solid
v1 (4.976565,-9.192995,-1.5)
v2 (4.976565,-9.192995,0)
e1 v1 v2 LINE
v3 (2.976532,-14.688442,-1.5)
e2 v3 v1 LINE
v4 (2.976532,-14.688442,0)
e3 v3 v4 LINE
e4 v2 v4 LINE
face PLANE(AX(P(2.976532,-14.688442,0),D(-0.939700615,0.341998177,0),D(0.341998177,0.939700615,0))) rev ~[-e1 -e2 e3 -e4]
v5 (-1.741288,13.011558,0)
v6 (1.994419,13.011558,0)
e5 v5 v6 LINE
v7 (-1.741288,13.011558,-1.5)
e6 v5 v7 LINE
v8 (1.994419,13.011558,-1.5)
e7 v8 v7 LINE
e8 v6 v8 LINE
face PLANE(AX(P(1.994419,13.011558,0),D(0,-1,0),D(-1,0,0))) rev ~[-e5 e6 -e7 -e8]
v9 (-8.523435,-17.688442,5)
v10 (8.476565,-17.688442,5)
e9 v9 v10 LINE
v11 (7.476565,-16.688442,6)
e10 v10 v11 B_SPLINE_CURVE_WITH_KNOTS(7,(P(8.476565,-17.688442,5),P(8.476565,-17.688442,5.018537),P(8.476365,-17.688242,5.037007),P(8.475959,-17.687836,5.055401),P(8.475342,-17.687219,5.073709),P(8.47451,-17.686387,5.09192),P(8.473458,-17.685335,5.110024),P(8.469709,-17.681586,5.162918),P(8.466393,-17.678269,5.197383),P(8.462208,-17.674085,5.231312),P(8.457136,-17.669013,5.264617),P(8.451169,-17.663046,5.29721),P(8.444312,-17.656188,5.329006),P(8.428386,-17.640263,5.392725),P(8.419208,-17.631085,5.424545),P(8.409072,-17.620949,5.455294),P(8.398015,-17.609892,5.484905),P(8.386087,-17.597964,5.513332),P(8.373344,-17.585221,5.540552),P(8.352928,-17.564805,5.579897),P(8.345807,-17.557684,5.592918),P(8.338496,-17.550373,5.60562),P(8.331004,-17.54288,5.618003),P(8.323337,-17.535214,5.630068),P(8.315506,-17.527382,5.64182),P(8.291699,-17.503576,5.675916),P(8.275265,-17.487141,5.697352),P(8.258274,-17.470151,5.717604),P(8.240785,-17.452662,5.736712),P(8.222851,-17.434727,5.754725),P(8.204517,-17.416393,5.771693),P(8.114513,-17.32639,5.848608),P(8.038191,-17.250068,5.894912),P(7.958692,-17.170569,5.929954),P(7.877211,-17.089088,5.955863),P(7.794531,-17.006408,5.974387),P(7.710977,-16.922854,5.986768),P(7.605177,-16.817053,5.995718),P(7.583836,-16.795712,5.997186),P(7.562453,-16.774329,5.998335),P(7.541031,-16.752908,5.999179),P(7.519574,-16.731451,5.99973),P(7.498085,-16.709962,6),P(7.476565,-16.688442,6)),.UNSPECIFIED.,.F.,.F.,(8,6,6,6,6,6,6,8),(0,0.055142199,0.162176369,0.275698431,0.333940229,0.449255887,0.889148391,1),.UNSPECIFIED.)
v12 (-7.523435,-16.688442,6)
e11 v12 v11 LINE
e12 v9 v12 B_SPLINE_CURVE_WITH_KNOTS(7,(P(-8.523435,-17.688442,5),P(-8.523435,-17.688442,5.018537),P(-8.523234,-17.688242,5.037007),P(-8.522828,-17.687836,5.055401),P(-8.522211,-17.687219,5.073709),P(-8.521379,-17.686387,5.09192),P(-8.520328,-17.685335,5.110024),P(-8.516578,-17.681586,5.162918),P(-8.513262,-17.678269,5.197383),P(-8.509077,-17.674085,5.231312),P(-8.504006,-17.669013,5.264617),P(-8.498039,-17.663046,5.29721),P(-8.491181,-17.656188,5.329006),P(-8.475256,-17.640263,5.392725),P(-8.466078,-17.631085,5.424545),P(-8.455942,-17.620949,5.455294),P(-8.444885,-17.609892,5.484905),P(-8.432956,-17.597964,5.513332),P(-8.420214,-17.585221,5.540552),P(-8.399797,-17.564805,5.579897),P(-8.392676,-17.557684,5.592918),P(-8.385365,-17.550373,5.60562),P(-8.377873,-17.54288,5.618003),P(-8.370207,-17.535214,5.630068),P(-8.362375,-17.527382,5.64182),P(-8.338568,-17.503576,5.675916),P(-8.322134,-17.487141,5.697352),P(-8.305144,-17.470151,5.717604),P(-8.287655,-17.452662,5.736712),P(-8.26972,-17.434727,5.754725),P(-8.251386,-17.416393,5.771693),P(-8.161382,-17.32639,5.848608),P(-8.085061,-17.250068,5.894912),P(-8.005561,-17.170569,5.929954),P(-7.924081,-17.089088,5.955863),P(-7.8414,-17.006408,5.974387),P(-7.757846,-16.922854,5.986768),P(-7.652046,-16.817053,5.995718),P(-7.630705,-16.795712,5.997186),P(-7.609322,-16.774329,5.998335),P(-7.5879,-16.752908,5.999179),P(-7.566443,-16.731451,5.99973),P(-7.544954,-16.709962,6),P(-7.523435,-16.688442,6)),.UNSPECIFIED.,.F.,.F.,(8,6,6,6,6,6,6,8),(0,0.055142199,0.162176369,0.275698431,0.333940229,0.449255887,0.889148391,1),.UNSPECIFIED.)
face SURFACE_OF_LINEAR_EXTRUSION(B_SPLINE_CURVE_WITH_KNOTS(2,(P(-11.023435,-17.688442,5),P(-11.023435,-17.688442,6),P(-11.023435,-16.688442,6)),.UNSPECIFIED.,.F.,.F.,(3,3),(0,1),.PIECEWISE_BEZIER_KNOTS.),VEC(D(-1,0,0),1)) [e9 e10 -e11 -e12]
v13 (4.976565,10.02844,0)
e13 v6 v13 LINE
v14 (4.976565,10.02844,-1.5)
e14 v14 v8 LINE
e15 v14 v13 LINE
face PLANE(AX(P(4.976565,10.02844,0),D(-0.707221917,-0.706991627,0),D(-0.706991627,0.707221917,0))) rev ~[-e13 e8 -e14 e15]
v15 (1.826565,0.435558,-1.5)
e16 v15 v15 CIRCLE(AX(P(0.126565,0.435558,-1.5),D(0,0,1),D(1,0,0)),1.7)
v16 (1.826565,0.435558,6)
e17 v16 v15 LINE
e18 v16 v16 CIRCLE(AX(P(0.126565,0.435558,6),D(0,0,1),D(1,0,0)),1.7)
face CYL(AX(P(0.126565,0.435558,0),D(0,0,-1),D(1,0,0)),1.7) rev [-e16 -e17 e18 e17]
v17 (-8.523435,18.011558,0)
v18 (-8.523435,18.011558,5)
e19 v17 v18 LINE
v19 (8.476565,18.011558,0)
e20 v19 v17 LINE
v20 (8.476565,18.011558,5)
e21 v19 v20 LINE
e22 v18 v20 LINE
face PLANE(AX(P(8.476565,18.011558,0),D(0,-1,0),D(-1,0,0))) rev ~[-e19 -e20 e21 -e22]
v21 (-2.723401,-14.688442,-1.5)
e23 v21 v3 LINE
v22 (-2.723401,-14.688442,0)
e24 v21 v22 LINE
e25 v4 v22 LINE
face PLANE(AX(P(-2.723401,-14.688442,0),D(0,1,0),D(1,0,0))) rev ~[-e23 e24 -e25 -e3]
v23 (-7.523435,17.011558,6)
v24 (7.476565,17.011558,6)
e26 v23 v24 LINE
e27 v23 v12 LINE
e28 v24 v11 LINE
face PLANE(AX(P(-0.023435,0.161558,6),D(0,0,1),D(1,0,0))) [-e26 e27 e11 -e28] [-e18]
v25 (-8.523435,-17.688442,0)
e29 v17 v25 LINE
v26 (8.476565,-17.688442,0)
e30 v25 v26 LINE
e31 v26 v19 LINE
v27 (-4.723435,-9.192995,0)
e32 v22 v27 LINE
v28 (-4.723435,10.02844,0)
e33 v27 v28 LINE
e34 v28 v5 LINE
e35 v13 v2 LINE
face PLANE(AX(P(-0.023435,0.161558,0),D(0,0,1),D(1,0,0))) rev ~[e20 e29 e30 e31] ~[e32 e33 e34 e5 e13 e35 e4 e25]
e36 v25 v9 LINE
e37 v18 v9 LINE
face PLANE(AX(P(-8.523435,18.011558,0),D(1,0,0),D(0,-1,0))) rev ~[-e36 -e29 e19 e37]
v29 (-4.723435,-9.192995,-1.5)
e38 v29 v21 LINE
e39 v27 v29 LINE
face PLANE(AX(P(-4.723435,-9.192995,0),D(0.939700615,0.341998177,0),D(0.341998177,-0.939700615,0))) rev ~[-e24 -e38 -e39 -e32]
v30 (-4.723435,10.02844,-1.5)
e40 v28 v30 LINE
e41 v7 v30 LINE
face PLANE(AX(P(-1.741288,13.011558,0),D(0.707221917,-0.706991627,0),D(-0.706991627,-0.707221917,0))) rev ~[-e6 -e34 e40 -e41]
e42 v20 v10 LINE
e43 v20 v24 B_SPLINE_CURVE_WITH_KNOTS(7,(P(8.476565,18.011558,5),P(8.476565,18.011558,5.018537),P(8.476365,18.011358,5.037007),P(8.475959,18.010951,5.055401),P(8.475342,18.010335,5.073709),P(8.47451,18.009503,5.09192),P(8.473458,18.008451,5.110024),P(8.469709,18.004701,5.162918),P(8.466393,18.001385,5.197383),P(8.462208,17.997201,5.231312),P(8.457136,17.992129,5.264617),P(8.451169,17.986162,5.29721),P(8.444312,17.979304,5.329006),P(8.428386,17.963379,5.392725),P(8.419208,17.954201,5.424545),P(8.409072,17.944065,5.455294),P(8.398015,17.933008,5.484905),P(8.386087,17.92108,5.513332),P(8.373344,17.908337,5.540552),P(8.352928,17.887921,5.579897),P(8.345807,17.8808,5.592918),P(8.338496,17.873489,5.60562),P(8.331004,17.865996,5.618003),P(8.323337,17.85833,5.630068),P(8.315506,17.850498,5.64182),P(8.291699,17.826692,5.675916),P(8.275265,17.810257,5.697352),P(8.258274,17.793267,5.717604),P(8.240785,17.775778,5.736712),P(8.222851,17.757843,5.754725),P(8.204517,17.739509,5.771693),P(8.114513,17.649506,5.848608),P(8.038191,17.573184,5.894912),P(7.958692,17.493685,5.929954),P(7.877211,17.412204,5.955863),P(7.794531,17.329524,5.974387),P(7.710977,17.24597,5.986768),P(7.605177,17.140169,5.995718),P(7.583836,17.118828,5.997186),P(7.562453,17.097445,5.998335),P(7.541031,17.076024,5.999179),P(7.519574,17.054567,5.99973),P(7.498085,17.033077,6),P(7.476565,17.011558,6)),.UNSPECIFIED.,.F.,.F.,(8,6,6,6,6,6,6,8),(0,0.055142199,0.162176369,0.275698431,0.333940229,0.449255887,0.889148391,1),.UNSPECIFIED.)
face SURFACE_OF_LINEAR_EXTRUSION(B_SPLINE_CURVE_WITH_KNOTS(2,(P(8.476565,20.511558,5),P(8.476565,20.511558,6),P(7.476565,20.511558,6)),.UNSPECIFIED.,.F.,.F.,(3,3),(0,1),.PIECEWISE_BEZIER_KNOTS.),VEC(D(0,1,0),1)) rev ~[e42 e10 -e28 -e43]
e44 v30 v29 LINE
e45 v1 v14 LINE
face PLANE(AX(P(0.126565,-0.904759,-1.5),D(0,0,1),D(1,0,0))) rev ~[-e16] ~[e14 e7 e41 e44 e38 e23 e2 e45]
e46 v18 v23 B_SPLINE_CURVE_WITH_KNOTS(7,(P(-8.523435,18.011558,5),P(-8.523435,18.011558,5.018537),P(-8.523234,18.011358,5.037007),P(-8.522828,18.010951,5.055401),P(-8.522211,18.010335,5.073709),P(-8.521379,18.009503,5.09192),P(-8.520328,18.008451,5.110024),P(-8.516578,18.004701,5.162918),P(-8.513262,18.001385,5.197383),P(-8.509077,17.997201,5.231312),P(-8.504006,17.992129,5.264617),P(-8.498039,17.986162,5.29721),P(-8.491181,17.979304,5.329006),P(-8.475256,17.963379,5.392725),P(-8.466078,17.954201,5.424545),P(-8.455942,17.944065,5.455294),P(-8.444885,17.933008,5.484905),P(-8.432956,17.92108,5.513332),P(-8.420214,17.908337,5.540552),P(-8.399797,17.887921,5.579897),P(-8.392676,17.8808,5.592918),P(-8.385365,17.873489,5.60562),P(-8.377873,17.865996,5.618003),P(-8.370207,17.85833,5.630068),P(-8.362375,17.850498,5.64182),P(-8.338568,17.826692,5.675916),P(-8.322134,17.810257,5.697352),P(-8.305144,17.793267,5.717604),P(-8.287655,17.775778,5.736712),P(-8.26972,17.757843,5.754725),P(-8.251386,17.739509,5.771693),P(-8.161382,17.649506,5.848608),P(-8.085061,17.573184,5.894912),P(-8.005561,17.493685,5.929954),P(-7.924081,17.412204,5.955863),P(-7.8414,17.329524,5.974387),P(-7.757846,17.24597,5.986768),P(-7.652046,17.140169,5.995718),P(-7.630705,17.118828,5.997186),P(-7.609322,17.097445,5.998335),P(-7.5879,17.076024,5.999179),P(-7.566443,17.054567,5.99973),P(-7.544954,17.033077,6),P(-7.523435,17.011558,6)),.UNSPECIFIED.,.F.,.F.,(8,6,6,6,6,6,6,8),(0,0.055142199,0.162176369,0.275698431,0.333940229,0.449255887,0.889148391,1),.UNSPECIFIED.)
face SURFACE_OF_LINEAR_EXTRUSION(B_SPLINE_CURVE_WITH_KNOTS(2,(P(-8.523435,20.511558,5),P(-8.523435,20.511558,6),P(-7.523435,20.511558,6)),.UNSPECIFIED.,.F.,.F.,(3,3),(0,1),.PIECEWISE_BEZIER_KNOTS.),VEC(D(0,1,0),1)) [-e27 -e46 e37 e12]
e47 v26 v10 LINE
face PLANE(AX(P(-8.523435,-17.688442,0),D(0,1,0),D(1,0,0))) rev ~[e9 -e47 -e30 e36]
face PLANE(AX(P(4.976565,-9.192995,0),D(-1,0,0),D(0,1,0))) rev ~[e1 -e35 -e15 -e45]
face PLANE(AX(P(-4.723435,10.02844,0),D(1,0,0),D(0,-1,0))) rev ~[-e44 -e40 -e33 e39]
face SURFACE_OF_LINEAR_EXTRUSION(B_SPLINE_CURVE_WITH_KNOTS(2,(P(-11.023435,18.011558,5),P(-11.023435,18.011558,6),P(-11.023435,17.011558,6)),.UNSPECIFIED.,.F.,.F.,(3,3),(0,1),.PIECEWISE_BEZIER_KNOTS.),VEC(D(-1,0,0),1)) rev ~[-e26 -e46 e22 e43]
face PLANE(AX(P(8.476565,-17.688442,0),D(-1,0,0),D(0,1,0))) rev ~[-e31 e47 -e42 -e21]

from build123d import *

# Parameters (mm, degrees)
F0_R          = 1.7
F1_DEPTH      = 1.5
F1_DEPTH_BACK = 6
F2_DEPTH      = 6
F3_T1_DEPTH   = 22
F3_T3_DEPTH   = 40.7


# Not quite as in the source:
# - a fillet or chamfer that OpenCascade refuses, or shapes differently, is made with other operations: its cross-section is extruded or revolved along the edge and cut away or added


with BuildPart() as f1:
    # F0 (on Top) → F1 (new body, two sides)
    with BuildSketch(Plane.XY) as f1_sk:
        Polygon((-4.7234346752, 0.4355579215), (-4.7234346752, -9.1929948391), (-2.7234009317, -14.6884420785), (2.9765315813, -14.6884420785), (4.9765653248, -9.1929948391), (4.9765653248, 0.4355579215), (4.9765653248, 10.028440195), (1.9944189816, 13.0115579215), (0.1265653248, 13.0115579215), (-1.7412883319, 13.0115579215), (-4.7234346752, 10.028440195), align=None)
        with Locations((0.1265653248, 0.4355579215)):
            Circle(F0_R, mode=Mode.SUBTRACT)
    extrude(amount=-F1_DEPTH)
    extrude(f1_sk.sketch, amount=F1_DEPTH_BACK)

    # F0 (on Top) → F2 (join)
    with BuildSketch(Plane.XY):
        Polygon((-8.5234346752, -17.6884420785), (0.1265653248, -17.6884420785), (4.9765653248, -17.6884420785), (8.4765653248, -17.6884420785), (8.4765653248, 18.0115579215), (-8.5234346752, 18.0115579215), align=None)
        Polygon((-2.7234009317, -14.6884420785), (-4.7234346752, -9.1929948391), (-4.7234346752, 0.4355579215), (-4.7234346752, 10.028440195), (-1.7412883319, 13.0115579215), (0.1265653248, 13.0115579215), (1.9944189816, 13.0115579215), (4.9765653248, 10.028440195), (4.9765653248, 0.4355579215), (4.9765653248, -9.1929948391), (2.9765315813, -14.6884420785), align=None, mode=Mode.SUBTRACT)
    extrude(amount=F2_DEPTH)

    # F3: fillet of radius 1 on 4 edges, made by hand

    # F3_s2 → F3_t1 (cut)
    with BuildSketch(Plane.YZ.offset(-11.0234346752)):
        with BuildLine():
            add(Edge.make_bspline(
                [(18.0115579215, 5), (18.0115579215, 6), (17.0115579215, 6)],
                knots=[0, 0, 0, 1, 1, 1], degree=2, weights=[1, 1, 1]))
            Line((17.0115579215, 6), (18.0115579215, 6))
            Line((18.0115579215, 6), (18.0115579215, 5))
        make_face()
        with BuildLine():
            add(Edge.make_bspline(
                [(-17.6884420785, 5), (-17.6884420785, 6), (-16.6884420785, 6)],
                knots=[0, 0, 0, 1, 1, 1], degree=2, weights=[1, 1, 1]))
            Line((-16.6884420785, 6), (-17.6884420785, 6))
            Line((-17.6884420785, 6), (-17.6884420785, 5))
        make_face()
    extrude(amount=F3_T1_DEPTH, mode=Mode.SUBTRACT)

    # F3_s4 → F3_t3 (cut)
    with BuildSketch(Plane.XZ.offset(-20.5115579215)):
        with BuildLine():
            add(Edge.make_bspline(
                [(-8.5234346752, 5), (-8.5234346752, 6), (-7.5234346752, 6)],
                knots=[0, 0, 0, 1, 1, 1], degree=2, weights=[1, 1, 1]))
            Line((-7.5234346752, 6), (-8.5234346752, 6))
            Line((-8.5234346752, 6), (-8.5234346752, 5))
        make_face()
        with BuildLine():
            add(Edge.make_bspline(
                [(8.4765653248, 5), (8.4765653248, 6), (7.4765653248, 6)],
                knots=[0, 0, 0, 1, 1, 1], degree=2, weights=[1, 1, 1]))
            Line((7.4765653248, 6), (8.4765653248, 6))
            Line((8.4765653248, 6), (8.4765653248, 5))
        make_face()
    extrude(amount=F3_T3_DEPTH, mode=Mode.SUBTRACT)


solid = f1.part
